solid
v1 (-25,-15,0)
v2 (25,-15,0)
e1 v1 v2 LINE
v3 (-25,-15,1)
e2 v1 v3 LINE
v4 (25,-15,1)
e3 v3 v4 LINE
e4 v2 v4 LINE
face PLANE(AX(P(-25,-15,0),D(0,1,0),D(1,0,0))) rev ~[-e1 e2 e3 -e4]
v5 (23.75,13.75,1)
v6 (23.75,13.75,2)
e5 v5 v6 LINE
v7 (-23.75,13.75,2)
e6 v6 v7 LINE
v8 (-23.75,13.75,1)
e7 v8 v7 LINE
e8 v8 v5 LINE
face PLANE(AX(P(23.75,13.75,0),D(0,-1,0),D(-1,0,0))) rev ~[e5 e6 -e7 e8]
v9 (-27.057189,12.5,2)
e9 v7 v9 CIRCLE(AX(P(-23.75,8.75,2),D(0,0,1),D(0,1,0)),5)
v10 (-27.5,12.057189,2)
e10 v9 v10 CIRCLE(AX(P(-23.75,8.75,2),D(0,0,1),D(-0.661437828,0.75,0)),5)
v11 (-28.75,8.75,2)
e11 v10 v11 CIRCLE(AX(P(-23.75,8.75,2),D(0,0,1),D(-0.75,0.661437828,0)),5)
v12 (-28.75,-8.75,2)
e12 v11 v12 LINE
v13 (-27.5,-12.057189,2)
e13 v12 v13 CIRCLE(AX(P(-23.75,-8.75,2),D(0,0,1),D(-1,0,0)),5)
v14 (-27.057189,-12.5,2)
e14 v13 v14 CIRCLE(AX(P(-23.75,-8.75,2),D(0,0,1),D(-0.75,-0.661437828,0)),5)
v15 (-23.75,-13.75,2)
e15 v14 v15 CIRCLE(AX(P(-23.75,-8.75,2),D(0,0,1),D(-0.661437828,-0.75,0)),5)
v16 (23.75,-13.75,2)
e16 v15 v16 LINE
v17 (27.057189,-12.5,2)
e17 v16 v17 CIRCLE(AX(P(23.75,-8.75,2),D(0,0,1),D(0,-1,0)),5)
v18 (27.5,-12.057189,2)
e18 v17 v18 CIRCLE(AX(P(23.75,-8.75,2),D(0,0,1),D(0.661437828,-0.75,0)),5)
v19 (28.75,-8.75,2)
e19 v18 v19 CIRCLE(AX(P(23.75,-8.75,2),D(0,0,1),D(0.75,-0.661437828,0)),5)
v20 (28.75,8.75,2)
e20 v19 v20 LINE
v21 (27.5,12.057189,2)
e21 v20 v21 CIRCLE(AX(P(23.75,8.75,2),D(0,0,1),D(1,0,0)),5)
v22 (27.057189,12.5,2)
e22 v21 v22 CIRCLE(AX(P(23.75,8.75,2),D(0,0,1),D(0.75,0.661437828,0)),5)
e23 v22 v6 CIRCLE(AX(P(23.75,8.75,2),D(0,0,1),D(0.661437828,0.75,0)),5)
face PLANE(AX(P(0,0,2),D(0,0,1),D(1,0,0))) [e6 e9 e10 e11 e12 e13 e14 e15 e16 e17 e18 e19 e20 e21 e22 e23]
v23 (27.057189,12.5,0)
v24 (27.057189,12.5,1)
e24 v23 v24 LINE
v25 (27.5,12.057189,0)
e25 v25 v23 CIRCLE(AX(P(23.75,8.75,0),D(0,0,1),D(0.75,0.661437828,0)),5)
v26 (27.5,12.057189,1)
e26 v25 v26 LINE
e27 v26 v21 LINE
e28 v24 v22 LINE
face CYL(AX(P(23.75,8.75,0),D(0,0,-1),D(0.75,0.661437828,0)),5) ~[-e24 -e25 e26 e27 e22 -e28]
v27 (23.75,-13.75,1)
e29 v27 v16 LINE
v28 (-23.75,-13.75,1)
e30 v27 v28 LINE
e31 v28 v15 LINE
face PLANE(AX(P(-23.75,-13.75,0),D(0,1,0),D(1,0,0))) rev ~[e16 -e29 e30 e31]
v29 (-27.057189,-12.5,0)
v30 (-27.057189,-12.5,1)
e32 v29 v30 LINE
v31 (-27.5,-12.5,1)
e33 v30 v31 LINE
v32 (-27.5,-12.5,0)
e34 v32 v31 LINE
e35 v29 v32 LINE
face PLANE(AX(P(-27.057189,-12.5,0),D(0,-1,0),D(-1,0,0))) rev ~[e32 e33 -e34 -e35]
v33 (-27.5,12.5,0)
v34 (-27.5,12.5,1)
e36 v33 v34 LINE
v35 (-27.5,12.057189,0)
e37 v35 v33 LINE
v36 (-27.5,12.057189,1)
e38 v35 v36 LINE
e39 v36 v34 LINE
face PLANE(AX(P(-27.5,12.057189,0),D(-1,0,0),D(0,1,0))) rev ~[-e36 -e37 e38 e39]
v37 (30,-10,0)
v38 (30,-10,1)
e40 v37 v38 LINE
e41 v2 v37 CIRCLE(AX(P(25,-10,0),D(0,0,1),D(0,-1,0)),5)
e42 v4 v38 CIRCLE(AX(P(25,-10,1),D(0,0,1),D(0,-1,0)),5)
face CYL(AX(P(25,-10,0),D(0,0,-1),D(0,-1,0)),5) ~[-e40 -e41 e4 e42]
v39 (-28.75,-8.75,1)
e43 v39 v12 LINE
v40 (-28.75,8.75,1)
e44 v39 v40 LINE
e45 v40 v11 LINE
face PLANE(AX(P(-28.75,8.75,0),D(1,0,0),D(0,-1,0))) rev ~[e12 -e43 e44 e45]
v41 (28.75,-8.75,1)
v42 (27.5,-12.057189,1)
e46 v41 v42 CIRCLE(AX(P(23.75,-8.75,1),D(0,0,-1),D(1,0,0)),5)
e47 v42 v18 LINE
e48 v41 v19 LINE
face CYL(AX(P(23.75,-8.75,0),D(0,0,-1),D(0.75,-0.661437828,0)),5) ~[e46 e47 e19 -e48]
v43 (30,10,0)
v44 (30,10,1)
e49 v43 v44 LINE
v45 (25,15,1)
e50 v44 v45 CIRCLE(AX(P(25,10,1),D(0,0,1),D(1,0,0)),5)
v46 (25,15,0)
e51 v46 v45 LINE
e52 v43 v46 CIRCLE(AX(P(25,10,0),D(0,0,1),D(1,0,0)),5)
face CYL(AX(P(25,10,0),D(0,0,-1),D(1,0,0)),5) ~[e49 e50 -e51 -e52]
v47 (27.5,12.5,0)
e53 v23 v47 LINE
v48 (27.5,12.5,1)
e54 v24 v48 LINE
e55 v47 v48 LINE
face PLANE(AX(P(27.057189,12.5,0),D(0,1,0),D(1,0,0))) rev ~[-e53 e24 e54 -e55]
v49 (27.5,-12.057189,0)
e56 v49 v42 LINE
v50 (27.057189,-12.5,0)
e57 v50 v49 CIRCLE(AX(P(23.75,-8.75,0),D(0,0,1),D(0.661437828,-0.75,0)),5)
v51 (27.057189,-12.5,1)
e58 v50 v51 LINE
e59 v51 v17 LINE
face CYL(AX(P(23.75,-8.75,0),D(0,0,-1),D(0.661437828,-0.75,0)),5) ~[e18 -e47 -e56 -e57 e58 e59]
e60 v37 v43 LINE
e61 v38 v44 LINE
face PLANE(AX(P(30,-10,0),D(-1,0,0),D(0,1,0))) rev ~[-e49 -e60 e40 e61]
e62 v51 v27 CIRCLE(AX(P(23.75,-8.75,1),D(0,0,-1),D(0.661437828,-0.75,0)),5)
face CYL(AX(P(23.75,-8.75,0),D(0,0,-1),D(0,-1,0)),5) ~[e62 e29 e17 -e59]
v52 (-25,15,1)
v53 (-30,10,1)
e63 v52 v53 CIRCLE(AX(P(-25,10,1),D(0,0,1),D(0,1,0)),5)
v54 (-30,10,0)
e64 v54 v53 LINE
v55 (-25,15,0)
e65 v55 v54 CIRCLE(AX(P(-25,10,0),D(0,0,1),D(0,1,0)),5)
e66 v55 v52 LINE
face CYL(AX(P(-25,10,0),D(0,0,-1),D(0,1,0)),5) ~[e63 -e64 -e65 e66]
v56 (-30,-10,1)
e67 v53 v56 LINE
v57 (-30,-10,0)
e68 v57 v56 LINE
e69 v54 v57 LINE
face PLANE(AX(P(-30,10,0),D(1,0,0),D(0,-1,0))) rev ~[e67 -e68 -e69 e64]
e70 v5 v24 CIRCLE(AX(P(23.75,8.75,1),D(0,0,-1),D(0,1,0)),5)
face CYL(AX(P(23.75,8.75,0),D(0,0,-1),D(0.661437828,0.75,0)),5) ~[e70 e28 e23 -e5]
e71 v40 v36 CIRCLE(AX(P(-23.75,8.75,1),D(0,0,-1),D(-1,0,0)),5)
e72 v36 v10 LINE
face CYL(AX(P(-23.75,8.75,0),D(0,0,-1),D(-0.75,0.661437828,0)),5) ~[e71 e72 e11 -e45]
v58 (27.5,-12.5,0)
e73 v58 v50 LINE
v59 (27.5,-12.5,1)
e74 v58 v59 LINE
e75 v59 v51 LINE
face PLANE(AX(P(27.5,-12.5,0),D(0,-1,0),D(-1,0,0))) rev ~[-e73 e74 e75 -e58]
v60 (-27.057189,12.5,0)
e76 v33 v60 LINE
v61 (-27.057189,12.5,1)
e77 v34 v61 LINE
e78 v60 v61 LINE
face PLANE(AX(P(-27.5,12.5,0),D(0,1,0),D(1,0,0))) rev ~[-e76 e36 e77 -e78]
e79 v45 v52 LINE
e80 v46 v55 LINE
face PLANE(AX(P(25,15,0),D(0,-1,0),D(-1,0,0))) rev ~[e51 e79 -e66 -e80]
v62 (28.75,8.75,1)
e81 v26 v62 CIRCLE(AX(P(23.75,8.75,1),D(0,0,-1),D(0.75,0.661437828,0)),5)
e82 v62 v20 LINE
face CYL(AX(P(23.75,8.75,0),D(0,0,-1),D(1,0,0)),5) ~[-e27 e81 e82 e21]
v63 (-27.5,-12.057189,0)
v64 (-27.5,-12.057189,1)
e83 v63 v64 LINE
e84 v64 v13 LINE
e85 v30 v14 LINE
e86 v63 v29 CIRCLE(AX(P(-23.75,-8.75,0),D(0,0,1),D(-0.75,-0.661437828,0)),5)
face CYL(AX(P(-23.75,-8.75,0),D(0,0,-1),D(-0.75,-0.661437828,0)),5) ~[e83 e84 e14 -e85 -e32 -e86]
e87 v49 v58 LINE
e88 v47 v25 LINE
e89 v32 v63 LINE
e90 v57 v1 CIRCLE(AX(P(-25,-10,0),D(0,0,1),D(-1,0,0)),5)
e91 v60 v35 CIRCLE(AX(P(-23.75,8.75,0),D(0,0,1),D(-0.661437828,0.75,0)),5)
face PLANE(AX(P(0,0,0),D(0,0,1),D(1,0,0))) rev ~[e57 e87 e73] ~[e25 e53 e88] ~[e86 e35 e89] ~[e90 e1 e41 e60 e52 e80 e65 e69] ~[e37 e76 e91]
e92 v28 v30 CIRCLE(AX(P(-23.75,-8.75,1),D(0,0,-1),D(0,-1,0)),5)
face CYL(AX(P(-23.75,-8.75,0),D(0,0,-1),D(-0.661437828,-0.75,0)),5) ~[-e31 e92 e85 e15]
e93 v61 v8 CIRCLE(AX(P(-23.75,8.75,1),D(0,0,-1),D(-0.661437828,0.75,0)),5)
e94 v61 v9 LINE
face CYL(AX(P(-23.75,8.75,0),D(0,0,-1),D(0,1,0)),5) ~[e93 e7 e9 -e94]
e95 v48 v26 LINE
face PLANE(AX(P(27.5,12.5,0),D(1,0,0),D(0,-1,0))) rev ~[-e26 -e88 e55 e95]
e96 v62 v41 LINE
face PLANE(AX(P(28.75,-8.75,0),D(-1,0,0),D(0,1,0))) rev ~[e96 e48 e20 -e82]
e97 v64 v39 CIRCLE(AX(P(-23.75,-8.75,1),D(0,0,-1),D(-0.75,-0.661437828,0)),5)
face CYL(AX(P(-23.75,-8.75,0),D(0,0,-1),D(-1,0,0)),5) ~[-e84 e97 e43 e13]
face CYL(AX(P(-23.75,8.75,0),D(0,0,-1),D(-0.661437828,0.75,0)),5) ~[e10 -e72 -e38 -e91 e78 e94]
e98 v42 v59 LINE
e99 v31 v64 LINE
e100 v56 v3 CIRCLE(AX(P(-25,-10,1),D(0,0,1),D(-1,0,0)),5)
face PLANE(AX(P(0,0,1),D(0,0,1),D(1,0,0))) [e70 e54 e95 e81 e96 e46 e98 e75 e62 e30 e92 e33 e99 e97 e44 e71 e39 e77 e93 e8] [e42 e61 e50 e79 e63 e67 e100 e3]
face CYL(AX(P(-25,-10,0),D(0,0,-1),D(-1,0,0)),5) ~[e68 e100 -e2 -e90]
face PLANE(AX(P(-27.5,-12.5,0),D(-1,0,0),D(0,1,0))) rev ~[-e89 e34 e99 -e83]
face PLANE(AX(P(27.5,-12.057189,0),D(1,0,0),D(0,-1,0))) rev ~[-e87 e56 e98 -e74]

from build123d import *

# Parameters (mm, degrees)
F1_DEPTH = 1
F2_DEPTH = 2


with BuildPart() as f1:
    # F0 (on Top) → F1 (new body)
    with BuildSketch(Plane.XY):
        with BuildLine():
            Line((25, 15), (-25, 15))
            ThreePointArc((-25, 15), (-28.5355339059, 13.5355339059), (-30, 10))
            Line((-30, 10), (-30, -10))
            ThreePointArc((-30, -10), (-28.5355339059, -13.5355339059), (-25, -15))
            Line((-25, -15), (25, -15))
            ThreePointArc((25, -15), (28.5355339059, -13.5355339059), (30, -10))
            Line((30, -10), (30, 10))
            ThreePointArc((30, 10), (28.5355339059, 13.5355339059), (25, 15))
        make_face()
        with BuildLine():
            Line((-27.5, 12.0571891388), (-27.5, 12.5))
            Line((-27.5, 12.5), (-27.0571891388, 12.5))
            ThreePointArc((-27.0571891388, 12.5), (-25.517766953, 13.4270717335), (-23.75, 13.75))
            Line((-23.75, 13.75), (23.75, 13.75))
            ThreePointArc((23.75, 13.75), (25.517766953, 13.4270717335), (27.0571891388, 12.5))
            Line((27.0571891388, 12.5), (27.5, 12.5))
            Line((27.5, 12.5), (27.5, 12.0571891388))
            ThreePointArc((27.5, 12.0571891388), (28.4270717335, 10.517766953), (28.75, 8.75))
            Line((28.75, 8.75), (28.75, -8.75))
            ThreePointArc((28.75, -8.75), (28.4270717335, -10.517766953), (27.5, -12.0571891388))
            Line((27.5, -12.0571891388), (27.5, -12.5))
            Line((27.5, -12.5), (27.0571891388, -12.5))
            ThreePointArc((27.0571891388, -12.5), (25.517766953, -13.4270717335), (23.75, -13.75))
            Line((23.75, -13.75), (-23.75, -13.75))
            ThreePointArc((-23.75, -13.75), (-25.517766953, -13.4270717335), (-27.0571891388, -12.5))
            Line((-27.0571891388, -12.5), (-27.5, -12.5))
            Line((-27.5, -12.5), (-27.5, -12.0571891388))
            ThreePointArc((-27.5, -12.0571891388), (-28.4270717335, -10.517766953), (-28.75, -8.75))
            Line((-28.75, -8.75), (-28.75, 8.75))
            ThreePointArc((-28.75, 8.75), (-28.4270717335, 10.517766953), (-27.5, 12.0571891388))
        make_face(mode=Mode.SUBTRACT)
    extrude(amount=F1_DEPTH)

    # F0 (on Top) → F2 (join)
    with BuildSketch(Plane.XY):
        with BuildLine():
            Line((27.0571891388, 12.5), (-27.0571891388, 12.5))
            ThreePointArc((-27.0571891388, 12.5), (-27.2855339059, 12.2855339059), (-27.5, 12.0571891388))
            Line((-27.5, 12.0571891388), (-27.5, -12.0571891388))
            ThreePointArc((-27.5, -12.0571891388), (-27.2855339059, -12.2855339059), (-27.0571891388, -12.5))
            Line((-27.0571891388, -12.5), (27.0571891388, -12.5))
            ThreePointArc((27.0571891388, -12.5), (27.2855339059, -12.2855339059), (27.5, -12.0571891388))
            Line((27.5, -12.0571891388), (27.5, 12.0571891388))
            ThreePointArc((27.5, 12.0571891388), (27.2855339059, 12.2855339059), (27.0571891388, 12.5))
        make_face()
        with BuildLine():
            ThreePointArc((28.75, 8.75), (28.4270717335, 10.517766953), (27.5, 12.0571891388))
            Line((27.5, 12.0571891388), (27.5, -12.0571891388))
            ThreePointArc((27.5, -12.0571891388), (28.4270717335, -10.517766953), (28.75, -8.75))
            Line((28.75, -8.75), (28.75, 8.75))
        make_face()
        with BuildLine():
            ThreePointArc((-23.75, 13.75), (-25.517766953, 13.4270717335), (-27.0571891388, 12.5))
            Line((-27.0571891388, 12.5), (27.0571891388, 12.5))
            ThreePointArc((27.0571891388, 12.5), (25.517766953, 13.4270717335), (23.75, 13.75))
            Line((23.75, 13.75), (-23.75, 13.75))
        make_face()
        with BuildLine():
            Line((27.0571891388, -12.5), (-27.0571891388, -12.5))
            ThreePointArc((-27.0571891388, -12.5), (-25.517766953, -13.4270717335), (-23.75, -13.75))
            Line((-23.75, -13.75), (23.75, -13.75))
            ThreePointArc((23.75, -13.75), (25.517766953, -13.4270717335), (27.0571891388, -12.5))
        make_face()
        with BuildLine():
            Line((-27.5, -12.0571891388), (-27.5, 12.0571891388))
            ThreePointArc((-27.5, 12.0571891388), (-28.4270717335, 10.517766953), (-28.75, 8.75))
            Line((-28.75, 8.75), (-28.75, -8.75))
            ThreePointArc((-28.75, -8.75), (-28.4270717335, -10.517766953), (-27.5, -12.0571891388))
        make_face()
    extrude(amount=F2_DEPTH)


solid = f1.part
